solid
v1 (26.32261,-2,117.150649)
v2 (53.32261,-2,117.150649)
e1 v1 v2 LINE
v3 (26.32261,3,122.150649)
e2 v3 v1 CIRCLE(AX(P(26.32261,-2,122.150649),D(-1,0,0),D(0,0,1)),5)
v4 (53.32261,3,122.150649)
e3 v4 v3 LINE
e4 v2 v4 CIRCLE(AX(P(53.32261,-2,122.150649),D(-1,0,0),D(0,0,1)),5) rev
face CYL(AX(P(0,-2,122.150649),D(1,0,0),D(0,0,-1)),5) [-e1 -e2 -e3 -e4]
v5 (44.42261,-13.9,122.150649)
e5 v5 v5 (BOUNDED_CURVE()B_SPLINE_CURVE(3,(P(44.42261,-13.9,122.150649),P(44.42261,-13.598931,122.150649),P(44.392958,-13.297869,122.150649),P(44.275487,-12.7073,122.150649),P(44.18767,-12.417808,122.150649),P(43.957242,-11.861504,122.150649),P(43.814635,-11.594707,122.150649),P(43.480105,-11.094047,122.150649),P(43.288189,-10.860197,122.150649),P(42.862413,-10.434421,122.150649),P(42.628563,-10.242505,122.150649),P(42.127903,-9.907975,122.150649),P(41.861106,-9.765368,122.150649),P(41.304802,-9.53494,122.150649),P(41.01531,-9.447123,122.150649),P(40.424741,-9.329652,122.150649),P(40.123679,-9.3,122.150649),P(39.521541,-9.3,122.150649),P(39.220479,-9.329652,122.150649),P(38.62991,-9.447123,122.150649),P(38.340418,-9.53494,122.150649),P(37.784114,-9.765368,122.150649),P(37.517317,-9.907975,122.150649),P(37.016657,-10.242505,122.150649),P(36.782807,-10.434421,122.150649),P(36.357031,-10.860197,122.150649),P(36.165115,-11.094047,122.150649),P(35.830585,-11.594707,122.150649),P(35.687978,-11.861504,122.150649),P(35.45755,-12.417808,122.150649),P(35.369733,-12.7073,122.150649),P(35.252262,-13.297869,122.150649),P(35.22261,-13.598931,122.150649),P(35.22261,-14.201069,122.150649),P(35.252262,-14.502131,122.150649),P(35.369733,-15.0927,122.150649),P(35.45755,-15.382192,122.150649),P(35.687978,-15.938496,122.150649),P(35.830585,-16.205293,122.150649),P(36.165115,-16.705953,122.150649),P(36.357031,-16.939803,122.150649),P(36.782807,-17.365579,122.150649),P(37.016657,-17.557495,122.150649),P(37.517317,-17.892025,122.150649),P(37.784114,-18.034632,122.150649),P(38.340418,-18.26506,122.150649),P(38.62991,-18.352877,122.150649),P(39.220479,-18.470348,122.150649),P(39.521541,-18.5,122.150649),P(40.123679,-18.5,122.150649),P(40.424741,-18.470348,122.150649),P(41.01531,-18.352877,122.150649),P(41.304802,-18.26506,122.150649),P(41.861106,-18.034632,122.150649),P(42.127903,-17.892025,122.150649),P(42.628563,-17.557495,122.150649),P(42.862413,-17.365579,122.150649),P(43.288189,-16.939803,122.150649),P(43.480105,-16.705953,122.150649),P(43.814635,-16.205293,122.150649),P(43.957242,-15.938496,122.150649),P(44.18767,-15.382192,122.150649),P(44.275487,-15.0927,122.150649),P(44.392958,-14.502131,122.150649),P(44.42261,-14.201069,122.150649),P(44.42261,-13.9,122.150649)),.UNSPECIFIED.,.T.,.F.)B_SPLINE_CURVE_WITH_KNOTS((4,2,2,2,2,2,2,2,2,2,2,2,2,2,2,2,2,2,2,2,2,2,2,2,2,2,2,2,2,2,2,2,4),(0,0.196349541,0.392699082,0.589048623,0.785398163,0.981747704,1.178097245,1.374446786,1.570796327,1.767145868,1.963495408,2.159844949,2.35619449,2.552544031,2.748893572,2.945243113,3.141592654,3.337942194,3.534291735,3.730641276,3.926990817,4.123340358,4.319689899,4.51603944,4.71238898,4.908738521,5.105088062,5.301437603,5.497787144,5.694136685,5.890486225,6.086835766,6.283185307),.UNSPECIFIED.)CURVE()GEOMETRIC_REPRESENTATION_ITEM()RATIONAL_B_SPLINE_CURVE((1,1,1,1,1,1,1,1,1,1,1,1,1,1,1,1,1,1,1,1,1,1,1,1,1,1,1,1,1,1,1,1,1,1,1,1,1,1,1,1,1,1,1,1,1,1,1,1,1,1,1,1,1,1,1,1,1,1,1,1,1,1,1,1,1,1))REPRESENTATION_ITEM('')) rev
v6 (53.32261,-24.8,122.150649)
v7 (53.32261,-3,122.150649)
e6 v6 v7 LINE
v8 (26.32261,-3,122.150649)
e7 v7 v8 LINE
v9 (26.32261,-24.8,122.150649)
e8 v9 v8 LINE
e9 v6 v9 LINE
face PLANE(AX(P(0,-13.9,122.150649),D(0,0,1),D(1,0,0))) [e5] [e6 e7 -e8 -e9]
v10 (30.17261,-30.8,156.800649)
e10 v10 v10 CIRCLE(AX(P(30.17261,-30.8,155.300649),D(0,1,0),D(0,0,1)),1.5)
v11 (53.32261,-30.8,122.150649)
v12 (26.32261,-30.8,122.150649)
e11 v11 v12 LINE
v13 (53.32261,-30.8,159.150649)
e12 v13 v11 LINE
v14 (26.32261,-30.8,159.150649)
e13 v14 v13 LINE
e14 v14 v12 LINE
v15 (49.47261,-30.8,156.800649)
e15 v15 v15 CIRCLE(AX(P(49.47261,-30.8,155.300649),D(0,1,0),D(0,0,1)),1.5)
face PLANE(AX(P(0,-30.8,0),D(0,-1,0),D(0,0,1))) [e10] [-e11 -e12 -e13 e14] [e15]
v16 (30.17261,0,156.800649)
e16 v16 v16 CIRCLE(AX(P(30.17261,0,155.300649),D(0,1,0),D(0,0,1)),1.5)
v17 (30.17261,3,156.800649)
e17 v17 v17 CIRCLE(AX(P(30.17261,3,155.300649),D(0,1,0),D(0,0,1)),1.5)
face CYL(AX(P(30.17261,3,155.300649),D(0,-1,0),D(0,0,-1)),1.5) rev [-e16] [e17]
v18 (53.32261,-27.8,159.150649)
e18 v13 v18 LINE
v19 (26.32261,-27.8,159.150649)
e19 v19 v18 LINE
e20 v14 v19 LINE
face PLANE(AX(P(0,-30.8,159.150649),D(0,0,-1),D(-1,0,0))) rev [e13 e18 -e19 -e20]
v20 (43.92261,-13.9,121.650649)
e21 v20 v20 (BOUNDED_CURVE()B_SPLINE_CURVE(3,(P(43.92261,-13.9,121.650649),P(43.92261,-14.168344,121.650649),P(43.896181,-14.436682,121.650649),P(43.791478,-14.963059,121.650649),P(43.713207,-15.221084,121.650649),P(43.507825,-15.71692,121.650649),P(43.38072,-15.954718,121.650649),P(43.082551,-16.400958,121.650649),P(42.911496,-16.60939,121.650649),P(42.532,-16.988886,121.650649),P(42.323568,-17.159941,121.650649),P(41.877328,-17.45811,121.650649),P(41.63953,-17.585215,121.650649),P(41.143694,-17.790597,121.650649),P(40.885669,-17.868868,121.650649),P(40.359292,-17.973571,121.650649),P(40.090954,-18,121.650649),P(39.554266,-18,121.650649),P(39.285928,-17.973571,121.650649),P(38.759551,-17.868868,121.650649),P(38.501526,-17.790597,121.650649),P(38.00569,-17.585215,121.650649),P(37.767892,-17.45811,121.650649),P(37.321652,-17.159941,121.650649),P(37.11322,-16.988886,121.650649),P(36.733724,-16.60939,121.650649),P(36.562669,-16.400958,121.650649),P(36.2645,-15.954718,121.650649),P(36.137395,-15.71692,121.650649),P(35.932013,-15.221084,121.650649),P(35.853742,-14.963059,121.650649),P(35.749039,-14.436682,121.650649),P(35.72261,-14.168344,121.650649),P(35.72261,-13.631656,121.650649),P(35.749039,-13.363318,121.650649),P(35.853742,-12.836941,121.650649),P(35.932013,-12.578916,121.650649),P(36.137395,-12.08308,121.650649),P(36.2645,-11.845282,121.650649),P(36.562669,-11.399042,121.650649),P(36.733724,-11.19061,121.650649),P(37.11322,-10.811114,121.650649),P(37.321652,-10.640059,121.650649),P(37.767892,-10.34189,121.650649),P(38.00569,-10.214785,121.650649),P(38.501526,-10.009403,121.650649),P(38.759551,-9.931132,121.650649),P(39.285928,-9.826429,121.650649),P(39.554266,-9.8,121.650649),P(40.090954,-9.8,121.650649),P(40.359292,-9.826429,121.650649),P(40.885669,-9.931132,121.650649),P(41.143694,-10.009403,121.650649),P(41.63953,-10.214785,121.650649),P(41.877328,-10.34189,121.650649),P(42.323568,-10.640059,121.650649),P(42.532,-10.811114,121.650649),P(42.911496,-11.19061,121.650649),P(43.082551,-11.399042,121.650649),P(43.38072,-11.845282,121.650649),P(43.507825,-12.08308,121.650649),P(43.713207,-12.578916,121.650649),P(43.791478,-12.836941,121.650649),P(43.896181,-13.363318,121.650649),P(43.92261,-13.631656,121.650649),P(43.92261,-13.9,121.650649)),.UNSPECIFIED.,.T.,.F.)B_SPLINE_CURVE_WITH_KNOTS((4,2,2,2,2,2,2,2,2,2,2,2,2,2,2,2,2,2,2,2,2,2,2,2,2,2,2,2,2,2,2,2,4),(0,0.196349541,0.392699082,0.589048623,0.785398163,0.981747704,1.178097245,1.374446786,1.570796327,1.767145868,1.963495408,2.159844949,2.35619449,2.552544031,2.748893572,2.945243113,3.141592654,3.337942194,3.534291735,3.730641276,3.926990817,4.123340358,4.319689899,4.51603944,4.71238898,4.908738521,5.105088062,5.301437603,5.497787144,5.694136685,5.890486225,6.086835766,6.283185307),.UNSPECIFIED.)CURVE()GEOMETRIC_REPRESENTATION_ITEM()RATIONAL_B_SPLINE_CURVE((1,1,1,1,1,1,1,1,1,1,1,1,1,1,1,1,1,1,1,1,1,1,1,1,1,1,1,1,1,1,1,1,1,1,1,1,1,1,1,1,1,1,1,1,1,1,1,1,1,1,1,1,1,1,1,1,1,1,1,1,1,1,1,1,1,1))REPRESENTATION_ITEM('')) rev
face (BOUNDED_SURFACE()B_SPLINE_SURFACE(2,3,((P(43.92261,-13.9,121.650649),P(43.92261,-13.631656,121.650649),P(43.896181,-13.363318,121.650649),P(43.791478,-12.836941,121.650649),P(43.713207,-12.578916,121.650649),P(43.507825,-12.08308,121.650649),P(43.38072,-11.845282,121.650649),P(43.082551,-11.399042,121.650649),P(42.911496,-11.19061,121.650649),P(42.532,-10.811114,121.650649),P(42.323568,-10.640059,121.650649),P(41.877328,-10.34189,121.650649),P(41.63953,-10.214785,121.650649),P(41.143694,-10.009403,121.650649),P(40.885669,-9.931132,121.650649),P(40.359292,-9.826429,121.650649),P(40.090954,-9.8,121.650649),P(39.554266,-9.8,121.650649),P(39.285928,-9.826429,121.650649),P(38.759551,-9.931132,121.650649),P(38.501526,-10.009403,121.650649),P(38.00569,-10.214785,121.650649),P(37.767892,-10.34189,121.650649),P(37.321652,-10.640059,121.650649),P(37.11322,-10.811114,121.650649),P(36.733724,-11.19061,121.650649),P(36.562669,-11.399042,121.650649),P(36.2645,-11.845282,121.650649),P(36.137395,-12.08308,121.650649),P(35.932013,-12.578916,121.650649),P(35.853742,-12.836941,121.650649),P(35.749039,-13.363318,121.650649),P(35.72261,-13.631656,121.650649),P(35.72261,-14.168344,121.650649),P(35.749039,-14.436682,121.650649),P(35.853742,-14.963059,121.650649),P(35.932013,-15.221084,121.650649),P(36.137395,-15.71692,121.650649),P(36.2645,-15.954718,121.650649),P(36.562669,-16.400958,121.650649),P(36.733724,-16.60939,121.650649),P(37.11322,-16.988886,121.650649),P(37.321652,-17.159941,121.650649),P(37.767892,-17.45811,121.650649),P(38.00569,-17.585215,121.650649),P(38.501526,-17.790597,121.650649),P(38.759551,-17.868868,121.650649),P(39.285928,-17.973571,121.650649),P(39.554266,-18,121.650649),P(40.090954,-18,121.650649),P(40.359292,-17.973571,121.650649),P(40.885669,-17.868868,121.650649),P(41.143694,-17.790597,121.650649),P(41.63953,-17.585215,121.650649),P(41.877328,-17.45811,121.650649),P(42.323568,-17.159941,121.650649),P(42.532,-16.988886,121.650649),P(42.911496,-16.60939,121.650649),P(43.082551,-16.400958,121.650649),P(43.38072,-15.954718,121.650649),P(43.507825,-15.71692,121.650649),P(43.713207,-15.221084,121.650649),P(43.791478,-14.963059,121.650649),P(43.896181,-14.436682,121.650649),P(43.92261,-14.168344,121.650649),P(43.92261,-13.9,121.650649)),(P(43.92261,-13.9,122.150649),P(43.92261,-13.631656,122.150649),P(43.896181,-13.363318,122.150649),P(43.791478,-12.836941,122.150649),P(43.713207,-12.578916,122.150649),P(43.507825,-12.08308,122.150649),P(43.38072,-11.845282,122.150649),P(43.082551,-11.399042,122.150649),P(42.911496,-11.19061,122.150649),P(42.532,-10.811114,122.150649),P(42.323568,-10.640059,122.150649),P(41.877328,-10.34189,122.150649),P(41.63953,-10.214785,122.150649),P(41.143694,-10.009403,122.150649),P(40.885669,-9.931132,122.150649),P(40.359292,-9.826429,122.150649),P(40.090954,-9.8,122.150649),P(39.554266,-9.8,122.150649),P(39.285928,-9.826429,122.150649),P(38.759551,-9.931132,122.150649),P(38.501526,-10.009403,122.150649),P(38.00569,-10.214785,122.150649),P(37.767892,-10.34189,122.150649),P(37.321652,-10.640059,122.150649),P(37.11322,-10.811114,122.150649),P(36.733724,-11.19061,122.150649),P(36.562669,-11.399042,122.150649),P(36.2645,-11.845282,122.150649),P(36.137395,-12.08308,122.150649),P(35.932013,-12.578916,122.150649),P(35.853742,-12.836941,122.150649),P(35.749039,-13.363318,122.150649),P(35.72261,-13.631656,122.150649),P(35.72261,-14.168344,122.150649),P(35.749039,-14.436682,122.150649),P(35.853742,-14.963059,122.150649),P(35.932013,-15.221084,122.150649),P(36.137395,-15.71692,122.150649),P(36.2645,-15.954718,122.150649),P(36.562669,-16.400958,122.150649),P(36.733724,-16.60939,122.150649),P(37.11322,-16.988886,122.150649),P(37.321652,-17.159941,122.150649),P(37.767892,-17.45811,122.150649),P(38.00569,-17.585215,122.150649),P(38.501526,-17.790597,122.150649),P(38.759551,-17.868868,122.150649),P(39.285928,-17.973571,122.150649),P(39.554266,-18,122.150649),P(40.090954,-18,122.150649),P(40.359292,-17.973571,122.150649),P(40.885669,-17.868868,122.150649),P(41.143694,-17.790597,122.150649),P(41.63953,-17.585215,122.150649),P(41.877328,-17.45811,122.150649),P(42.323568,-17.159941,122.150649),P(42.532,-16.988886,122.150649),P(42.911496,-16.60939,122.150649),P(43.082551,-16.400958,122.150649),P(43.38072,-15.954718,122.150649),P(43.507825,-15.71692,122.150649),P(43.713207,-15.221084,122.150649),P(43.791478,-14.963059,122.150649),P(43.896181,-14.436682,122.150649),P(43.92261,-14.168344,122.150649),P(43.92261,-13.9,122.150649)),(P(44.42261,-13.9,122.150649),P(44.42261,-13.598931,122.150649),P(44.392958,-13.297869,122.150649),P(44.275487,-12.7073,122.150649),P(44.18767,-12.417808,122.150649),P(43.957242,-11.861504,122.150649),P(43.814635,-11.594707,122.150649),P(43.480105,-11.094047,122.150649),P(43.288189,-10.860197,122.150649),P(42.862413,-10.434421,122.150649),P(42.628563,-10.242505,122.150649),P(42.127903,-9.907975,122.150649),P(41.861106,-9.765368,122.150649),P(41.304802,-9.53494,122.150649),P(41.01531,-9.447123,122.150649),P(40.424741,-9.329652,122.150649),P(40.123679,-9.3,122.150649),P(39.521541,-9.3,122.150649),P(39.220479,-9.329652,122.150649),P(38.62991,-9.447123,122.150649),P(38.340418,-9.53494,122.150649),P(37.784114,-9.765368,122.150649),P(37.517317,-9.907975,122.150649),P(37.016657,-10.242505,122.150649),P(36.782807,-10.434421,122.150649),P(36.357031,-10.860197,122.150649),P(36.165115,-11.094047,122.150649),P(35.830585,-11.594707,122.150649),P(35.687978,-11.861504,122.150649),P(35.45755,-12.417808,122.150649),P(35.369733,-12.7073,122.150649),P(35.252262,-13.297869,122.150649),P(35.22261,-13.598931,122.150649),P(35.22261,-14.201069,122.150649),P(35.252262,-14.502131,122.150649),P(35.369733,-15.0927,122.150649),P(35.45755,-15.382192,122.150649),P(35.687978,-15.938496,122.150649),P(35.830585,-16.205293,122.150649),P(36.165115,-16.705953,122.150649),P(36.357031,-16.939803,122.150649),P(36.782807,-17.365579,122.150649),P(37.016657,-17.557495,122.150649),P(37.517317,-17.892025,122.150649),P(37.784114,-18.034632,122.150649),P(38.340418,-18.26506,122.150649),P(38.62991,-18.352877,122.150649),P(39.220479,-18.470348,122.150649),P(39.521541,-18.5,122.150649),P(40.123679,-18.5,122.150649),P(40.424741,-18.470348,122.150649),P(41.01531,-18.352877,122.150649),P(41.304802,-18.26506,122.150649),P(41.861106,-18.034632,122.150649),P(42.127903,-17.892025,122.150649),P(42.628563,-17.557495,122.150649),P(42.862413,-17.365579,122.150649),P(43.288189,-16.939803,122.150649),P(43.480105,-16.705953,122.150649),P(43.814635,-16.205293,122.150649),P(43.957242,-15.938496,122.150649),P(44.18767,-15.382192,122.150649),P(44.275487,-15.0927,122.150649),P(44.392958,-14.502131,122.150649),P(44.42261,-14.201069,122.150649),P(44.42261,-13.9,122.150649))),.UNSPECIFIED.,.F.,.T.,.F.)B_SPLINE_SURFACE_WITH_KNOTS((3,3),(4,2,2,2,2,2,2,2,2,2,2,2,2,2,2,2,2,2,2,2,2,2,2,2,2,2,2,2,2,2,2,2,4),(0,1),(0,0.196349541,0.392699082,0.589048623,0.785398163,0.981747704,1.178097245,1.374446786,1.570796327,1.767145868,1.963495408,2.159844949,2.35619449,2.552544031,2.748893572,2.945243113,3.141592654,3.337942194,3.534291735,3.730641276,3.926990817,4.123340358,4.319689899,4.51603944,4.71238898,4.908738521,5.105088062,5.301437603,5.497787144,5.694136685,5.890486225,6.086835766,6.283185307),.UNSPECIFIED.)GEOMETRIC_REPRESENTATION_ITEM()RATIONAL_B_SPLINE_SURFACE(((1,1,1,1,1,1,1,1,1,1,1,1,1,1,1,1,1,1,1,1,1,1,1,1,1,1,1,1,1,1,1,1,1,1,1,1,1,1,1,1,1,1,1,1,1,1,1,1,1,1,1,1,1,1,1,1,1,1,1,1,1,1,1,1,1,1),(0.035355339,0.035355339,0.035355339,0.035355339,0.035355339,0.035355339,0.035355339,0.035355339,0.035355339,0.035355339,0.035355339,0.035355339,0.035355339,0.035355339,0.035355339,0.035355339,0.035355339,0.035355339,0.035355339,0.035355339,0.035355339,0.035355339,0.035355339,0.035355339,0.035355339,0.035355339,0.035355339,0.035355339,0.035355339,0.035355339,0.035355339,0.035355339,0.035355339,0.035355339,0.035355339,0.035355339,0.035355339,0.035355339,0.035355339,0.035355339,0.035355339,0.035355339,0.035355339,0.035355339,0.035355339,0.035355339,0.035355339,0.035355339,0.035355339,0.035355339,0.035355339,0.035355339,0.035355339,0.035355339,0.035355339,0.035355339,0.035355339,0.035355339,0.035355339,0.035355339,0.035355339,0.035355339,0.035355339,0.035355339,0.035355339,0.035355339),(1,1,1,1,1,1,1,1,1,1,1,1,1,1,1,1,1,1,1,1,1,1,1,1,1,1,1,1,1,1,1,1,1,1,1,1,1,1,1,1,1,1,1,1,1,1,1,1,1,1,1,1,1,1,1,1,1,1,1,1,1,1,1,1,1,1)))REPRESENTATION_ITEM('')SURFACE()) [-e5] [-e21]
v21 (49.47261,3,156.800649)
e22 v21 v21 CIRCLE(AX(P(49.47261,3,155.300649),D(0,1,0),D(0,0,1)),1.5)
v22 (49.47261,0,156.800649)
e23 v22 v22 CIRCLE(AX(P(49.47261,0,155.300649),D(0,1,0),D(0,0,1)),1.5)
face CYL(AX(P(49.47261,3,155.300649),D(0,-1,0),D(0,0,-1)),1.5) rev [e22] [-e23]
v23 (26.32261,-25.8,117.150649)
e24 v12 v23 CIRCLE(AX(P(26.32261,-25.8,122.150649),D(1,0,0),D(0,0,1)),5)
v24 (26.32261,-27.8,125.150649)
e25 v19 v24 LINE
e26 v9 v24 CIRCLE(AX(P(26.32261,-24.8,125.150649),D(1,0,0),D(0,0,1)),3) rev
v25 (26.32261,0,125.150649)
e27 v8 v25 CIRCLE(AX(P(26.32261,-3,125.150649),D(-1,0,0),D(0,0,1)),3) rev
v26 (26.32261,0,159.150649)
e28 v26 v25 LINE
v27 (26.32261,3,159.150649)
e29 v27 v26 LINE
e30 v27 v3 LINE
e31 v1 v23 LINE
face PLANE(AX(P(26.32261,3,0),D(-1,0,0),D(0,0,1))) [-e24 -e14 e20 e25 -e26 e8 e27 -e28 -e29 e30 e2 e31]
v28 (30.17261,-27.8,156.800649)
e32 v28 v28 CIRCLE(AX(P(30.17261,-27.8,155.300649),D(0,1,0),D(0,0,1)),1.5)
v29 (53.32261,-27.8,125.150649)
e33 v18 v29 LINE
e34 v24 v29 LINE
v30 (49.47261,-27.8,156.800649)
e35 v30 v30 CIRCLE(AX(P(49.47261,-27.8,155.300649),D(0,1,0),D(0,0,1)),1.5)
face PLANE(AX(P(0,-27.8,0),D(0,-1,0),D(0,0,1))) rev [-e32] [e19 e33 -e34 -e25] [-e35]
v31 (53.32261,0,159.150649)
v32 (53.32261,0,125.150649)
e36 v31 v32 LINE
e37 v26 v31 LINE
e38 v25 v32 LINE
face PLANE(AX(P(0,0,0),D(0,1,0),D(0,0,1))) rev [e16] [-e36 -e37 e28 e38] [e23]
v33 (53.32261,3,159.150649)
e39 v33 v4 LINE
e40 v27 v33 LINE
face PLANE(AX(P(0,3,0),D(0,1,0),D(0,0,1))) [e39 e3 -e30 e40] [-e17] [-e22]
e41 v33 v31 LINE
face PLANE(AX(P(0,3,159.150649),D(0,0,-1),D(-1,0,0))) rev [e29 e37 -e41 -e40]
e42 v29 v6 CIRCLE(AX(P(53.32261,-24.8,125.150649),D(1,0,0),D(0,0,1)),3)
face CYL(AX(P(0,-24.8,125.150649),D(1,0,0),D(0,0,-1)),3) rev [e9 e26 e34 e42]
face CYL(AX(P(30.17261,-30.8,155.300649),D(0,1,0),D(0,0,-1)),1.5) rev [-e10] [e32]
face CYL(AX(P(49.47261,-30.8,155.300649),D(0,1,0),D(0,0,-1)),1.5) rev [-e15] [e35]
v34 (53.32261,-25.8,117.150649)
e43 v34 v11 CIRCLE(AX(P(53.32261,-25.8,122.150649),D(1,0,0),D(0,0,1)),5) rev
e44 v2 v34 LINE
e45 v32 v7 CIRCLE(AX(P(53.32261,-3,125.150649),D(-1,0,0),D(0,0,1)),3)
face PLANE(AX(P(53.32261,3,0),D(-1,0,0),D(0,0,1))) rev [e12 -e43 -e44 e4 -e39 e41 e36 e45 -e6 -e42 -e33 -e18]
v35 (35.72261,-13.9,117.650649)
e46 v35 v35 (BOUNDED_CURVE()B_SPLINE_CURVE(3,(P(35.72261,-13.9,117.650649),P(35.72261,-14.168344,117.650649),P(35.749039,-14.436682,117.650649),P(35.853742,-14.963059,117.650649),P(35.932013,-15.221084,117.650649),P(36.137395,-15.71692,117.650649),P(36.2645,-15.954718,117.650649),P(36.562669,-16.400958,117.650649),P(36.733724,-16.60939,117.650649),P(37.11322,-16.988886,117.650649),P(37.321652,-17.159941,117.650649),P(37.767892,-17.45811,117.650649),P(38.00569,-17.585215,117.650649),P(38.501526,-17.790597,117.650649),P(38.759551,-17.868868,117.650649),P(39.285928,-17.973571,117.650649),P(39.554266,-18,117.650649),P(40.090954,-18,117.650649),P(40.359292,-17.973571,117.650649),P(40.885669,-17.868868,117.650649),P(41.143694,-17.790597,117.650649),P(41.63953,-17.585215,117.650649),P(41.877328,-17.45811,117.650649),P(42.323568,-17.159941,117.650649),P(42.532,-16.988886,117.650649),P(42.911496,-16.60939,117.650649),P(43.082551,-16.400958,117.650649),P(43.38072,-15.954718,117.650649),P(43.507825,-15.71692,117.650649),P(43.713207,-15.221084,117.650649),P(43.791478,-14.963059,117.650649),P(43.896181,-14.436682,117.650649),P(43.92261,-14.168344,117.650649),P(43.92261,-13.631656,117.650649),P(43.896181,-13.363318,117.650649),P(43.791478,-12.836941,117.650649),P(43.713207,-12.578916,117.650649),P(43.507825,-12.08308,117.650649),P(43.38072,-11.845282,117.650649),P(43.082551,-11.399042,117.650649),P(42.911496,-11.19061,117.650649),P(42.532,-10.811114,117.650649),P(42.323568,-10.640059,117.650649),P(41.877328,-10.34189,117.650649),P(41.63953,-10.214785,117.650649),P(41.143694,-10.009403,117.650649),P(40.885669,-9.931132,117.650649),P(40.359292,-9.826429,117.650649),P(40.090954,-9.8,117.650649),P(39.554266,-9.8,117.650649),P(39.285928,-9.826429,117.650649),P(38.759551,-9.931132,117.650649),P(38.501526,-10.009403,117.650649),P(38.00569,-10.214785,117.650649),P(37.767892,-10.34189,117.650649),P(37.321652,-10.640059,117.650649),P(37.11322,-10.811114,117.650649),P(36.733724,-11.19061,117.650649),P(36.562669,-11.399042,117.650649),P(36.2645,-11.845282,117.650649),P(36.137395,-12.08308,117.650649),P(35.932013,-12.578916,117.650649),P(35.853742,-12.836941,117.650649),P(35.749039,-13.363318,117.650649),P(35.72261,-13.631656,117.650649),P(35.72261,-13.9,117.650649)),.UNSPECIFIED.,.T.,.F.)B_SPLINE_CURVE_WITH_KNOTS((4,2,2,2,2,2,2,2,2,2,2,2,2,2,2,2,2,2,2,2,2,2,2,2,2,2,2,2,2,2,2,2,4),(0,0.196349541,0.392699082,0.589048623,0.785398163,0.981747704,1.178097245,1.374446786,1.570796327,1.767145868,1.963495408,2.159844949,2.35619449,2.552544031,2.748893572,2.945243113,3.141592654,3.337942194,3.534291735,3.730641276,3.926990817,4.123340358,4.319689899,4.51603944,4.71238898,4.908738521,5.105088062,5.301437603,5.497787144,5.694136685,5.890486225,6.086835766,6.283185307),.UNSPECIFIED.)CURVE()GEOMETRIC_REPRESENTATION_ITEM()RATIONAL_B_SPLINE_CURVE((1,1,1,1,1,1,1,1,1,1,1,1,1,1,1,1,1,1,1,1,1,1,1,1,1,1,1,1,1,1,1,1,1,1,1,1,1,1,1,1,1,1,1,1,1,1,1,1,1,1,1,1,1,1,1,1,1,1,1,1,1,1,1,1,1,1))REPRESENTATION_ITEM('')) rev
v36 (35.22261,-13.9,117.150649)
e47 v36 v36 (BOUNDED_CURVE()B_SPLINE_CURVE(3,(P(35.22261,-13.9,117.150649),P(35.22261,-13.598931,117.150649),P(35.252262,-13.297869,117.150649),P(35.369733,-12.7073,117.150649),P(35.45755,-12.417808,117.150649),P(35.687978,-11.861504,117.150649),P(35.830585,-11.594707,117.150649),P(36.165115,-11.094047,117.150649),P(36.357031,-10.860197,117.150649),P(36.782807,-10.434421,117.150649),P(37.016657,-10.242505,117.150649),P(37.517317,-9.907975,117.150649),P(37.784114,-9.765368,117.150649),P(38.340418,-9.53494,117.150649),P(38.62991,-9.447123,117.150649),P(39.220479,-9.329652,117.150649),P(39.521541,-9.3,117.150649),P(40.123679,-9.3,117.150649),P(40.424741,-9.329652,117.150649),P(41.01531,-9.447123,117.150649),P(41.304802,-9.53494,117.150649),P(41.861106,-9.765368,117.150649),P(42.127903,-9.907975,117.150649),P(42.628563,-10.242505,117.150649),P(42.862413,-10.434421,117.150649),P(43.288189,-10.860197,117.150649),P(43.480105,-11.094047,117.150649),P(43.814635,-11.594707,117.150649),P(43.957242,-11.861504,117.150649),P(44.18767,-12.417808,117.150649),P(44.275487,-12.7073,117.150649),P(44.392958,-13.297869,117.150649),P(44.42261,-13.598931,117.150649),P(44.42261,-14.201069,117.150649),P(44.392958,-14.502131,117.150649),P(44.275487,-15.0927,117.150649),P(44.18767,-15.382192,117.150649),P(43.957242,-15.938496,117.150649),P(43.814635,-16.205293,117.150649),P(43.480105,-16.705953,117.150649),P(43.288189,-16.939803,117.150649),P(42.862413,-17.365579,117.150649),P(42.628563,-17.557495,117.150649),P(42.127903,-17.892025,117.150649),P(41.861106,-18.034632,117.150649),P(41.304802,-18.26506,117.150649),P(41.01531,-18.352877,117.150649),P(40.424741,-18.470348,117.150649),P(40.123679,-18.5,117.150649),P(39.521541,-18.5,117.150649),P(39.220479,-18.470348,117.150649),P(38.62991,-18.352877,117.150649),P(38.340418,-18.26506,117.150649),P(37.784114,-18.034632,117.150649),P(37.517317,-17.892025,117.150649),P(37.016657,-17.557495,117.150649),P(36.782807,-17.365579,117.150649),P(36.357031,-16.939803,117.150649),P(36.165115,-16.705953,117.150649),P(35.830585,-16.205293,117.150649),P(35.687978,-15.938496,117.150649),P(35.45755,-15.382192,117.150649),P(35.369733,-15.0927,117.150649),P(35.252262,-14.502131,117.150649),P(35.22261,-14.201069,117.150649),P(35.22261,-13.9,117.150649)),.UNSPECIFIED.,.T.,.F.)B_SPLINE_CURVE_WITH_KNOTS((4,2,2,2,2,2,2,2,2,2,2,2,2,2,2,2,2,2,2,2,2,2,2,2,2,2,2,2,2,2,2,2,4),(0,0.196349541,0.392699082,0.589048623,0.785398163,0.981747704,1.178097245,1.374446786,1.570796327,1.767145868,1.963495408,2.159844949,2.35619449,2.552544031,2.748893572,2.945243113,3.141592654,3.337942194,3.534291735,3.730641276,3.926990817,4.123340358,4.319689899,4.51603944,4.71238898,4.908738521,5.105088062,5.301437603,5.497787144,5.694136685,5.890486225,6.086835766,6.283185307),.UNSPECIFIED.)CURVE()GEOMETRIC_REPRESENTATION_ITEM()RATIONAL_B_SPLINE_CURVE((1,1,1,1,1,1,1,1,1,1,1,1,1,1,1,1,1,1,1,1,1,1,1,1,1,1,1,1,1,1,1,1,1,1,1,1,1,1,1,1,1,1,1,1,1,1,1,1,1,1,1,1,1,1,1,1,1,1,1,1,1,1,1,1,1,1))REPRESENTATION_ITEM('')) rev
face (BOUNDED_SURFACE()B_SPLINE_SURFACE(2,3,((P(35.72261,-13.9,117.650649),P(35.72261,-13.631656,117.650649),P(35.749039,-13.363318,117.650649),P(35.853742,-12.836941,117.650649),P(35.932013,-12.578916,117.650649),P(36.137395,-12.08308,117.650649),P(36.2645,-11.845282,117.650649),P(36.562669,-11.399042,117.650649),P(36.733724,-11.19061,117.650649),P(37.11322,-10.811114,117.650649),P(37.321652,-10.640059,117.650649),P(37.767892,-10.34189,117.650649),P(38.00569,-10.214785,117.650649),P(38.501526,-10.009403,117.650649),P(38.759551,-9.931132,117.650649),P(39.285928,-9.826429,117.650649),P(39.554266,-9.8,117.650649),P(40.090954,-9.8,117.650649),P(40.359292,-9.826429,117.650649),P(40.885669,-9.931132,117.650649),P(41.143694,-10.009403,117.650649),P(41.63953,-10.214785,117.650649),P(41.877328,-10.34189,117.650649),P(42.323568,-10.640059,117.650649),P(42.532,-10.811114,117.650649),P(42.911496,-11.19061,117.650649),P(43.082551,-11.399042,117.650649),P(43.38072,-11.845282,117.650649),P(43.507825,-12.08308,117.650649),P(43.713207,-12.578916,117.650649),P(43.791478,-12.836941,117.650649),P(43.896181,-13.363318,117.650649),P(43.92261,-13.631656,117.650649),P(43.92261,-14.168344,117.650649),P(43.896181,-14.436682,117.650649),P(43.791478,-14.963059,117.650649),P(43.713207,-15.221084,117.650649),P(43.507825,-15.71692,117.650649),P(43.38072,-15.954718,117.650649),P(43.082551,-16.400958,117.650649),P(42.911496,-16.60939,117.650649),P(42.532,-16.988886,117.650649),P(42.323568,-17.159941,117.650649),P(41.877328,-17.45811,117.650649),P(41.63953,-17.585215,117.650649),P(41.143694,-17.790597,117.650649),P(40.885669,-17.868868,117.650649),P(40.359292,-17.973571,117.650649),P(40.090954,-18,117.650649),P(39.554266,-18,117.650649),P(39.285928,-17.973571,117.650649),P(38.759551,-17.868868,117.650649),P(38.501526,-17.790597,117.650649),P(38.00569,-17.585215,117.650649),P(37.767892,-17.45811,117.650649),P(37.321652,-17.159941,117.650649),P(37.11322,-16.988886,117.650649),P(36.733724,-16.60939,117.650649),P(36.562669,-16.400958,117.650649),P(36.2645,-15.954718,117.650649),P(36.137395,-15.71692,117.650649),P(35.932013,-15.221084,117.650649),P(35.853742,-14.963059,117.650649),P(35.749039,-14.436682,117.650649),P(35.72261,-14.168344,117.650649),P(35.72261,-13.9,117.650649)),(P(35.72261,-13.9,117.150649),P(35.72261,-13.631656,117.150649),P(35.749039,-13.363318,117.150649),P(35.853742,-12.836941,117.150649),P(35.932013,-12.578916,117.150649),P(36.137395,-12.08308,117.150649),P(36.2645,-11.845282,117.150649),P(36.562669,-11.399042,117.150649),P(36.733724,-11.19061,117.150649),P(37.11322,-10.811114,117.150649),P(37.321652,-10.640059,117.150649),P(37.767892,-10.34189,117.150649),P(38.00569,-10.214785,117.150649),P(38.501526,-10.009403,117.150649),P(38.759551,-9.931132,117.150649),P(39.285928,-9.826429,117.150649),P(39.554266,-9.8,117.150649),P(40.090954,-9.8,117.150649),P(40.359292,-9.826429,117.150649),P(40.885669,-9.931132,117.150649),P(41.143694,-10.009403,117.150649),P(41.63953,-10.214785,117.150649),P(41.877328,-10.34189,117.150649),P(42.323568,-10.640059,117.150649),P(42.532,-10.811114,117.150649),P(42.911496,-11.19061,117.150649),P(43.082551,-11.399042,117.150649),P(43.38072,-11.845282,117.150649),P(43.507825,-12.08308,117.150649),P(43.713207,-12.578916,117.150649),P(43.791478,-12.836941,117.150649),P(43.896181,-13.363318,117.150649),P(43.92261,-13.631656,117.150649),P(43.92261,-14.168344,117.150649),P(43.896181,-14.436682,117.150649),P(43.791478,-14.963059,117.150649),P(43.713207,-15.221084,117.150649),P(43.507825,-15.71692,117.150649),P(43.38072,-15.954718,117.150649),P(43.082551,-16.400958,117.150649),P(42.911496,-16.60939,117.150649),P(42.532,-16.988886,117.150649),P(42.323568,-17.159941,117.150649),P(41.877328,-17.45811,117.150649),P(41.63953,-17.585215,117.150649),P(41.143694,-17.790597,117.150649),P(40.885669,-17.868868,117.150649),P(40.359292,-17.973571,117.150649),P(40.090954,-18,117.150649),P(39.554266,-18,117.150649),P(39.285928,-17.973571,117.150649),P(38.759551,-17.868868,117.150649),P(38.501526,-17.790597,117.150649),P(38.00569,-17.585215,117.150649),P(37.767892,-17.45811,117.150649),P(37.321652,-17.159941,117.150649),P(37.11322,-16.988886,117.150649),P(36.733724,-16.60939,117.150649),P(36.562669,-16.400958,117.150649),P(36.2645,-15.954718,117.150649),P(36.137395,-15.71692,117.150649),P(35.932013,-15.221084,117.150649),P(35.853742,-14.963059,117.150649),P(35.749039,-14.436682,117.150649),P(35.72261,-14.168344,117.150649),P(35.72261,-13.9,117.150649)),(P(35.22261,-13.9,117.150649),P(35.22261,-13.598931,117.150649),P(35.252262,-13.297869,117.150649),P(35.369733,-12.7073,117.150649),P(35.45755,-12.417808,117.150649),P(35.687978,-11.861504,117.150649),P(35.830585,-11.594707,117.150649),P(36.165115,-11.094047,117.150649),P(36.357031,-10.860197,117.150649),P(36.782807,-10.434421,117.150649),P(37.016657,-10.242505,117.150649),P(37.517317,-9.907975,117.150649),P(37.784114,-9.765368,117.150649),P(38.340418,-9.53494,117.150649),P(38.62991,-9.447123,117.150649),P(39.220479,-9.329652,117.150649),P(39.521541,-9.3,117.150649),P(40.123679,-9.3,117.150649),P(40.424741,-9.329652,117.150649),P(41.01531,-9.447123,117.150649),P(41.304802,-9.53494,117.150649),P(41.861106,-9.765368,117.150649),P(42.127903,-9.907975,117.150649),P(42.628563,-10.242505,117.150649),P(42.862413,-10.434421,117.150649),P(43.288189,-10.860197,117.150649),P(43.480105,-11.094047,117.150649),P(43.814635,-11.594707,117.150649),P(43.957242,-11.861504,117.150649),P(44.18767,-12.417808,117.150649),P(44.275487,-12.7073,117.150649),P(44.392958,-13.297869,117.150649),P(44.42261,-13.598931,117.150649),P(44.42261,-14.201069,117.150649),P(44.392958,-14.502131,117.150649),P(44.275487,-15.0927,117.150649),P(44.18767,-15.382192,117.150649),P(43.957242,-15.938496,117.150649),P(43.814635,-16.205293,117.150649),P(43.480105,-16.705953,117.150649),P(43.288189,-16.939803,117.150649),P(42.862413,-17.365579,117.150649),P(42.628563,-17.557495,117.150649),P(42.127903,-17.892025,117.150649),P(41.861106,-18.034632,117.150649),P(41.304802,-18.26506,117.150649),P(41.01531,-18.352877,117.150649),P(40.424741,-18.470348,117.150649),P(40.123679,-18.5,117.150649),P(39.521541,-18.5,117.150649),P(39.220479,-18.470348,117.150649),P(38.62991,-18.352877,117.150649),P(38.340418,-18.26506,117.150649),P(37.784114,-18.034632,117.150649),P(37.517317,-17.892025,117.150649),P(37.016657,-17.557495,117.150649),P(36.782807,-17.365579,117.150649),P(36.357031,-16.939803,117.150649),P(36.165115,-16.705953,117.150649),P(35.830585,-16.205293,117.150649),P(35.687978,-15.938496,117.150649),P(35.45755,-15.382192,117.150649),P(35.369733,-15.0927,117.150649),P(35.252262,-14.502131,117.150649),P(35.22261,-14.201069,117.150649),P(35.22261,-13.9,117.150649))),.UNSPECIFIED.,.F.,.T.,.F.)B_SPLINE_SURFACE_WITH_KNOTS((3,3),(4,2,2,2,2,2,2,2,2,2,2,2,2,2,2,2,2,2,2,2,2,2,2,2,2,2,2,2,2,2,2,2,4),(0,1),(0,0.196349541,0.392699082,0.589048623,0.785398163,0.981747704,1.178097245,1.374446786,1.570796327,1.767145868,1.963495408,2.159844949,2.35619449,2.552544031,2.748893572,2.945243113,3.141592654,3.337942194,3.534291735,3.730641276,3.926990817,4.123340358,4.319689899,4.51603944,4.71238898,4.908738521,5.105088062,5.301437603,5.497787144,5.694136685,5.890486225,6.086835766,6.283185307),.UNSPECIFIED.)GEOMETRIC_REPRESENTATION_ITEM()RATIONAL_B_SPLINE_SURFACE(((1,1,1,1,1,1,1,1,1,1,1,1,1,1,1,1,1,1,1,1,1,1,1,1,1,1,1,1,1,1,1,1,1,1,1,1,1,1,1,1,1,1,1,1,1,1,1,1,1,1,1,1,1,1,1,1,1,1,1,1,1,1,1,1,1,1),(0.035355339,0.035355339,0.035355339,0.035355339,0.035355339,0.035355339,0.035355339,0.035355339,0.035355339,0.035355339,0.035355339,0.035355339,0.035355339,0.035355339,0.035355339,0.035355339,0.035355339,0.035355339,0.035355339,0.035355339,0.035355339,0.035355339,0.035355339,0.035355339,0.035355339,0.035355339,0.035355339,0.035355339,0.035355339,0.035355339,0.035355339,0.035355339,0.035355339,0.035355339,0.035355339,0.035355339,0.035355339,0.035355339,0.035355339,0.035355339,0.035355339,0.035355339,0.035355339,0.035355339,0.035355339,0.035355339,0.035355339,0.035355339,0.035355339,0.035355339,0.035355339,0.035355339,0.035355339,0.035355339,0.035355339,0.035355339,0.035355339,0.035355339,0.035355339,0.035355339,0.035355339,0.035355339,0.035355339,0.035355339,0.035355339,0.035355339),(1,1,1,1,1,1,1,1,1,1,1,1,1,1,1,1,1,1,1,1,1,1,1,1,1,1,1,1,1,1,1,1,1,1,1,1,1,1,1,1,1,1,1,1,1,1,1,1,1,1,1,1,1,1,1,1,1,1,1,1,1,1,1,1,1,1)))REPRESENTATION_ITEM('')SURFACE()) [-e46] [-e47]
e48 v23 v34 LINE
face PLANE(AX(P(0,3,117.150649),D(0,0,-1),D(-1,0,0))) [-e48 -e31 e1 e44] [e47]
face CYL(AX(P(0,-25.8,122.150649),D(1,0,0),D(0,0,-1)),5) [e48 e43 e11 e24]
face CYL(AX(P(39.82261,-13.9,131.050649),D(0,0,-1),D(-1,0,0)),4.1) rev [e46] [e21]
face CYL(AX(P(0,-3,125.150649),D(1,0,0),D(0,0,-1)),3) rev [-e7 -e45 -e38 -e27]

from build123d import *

# Parameters (mm, degrees)
SKETCH1_W           = 27
SKETCH1_H           = 42
SKETCH1_R           = 1.5
BOSS_EXTRUDE1_DEPTH = 3
SKETCH1_3_W         = 27
SKETCH1_3_H         = 5
BOSS_EXTRUDE2_DEPTH = 13.9
FILLET1_R           = 3
FILLET2_R           = 5
SKETCH3_R           = 4.1
CUT_EXTRUDE1_DEPTH  = 13.9
FILLET3_SIZE        = 0.5


with BuildPart() as part:
    # Sketch1 → Boss-Extrude1 (new body)
    with BuildSketch(Plane(origin=(0, 0, 0), x_dir=(1, 0, 0), z_dir=(0, 1, 0))):
        with Locations((39.822610006, -138.150649163)):
            Rectangle(SKETCH1_W, SKETCH1_H)
        with Locations(Location((49.472610006, -155.300649163, 0), (0, 0, 270))):
            Circle(SKETCH1_R, mode=Mode.SUBTRACT)
        with Locations(Location((30.172610006, -155.300649163, 0), (0, 0, 270))):
            Circle(SKETCH1_R, mode=Mode.SUBTRACT)
    extrude(amount=BOSS_EXTRUDE1_DEPTH)

    # Sketch1<3> → Boss-Extrude2 (add)
    with BuildSketch(Plane(origin=(0, 0, 0), x_dir=(1, 0, 0), z_dir=(0, 1, 0))):
        with Locations((39.822610006, -119.650649163)):
            Rectangle(SKETCH1_3_W, SKETCH1_3_H)
    extrude(amount=-BOSS_EXTRUDE2_DEPTH)

    # Fillet1
    fillet1_edges = [part.edges().sort_by_distance(p)[0] for p in [
        (39.822610006, 0, 122.150649163),
    ]]
    fillet(fillet1_edges, radius=FILLET1_R)

    # Fillet2
    fillet2_edges = [part.edges().sort_by_distance(p)[0] for p in [
        (39.822610006, 3, 117.150649163),
    ]]
    fillet(fillet2_edges, radius=FILLET2_R)

    # Mirror7: part across plane


with BuildPart() as part_1:
    add(part.part)
    add(part.part.mirror(Plane.ZX.offset(-13.9)))

    # Sketch3 → Cut-Extrude1 (cut)
    with BuildSketch(Plane(origin=(0, 0, 117.150649163), x_dir=(-1, 0, 0), z_dir=(0, 0, -1))):
        with Locations((-39.822610006, -13.9)):
            Circle(SKETCH3_R)
    extrude(amount=-CUT_EXTRUDE1_DEPTH, mode=Mode.SUBTRACT)

    # Fillet3
    # a fillet whose section is not a circle: 0.5 mm, written as the material it takes off along each edge
    with BuildSketch(Plane(origin=(39.822610006, -13.9, 122.150649163), x_dir=(-1, 0, 0), z_dir=(0, -1, 0))) as fillet3_piece_1:
        with BuildLine():
            Bezier((4.1 + FILLET3_SIZE, 0), (4.1, 0), (4.1, FILLET3_SIZE), weights=[1, 0.035355339, 1])
            Line((4.1, FILLET3_SIZE), (4.1, 0))
            Line((4.1, 0), (4.1 + FILLET3_SIZE, 0))
        make_face()
    revolve(axis=Axis((39.822610006, -13.9, 122.150649163), (0, 0, -1)), mode=Mode.SUBTRACT)
    with BuildSketch(Plane(origin=(39.822610006, -13.9, 117.150649163), x_dir=(-1, 0, 0), z_dir=(0, -1, 0))) as fillet3_piece_2:
        with BuildLine():
            Bezier((4.1 + FILLET3_SIZE, 0), (4.1, 0), (4.1, -FILLET3_SIZE), weights=[1, 0.035355339, 1])
            Line((4.1, -FILLET3_SIZE), (4.1, 0))
            Line((4.1, 0), (4.1 + FILLET3_SIZE, 0))
        make_face()
    revolve(axis=Axis((39.822610006, -13.9, 117.150649163), (0, 0, -1)), mode=Mode.SUBTRACT)


solid = part_1.part
